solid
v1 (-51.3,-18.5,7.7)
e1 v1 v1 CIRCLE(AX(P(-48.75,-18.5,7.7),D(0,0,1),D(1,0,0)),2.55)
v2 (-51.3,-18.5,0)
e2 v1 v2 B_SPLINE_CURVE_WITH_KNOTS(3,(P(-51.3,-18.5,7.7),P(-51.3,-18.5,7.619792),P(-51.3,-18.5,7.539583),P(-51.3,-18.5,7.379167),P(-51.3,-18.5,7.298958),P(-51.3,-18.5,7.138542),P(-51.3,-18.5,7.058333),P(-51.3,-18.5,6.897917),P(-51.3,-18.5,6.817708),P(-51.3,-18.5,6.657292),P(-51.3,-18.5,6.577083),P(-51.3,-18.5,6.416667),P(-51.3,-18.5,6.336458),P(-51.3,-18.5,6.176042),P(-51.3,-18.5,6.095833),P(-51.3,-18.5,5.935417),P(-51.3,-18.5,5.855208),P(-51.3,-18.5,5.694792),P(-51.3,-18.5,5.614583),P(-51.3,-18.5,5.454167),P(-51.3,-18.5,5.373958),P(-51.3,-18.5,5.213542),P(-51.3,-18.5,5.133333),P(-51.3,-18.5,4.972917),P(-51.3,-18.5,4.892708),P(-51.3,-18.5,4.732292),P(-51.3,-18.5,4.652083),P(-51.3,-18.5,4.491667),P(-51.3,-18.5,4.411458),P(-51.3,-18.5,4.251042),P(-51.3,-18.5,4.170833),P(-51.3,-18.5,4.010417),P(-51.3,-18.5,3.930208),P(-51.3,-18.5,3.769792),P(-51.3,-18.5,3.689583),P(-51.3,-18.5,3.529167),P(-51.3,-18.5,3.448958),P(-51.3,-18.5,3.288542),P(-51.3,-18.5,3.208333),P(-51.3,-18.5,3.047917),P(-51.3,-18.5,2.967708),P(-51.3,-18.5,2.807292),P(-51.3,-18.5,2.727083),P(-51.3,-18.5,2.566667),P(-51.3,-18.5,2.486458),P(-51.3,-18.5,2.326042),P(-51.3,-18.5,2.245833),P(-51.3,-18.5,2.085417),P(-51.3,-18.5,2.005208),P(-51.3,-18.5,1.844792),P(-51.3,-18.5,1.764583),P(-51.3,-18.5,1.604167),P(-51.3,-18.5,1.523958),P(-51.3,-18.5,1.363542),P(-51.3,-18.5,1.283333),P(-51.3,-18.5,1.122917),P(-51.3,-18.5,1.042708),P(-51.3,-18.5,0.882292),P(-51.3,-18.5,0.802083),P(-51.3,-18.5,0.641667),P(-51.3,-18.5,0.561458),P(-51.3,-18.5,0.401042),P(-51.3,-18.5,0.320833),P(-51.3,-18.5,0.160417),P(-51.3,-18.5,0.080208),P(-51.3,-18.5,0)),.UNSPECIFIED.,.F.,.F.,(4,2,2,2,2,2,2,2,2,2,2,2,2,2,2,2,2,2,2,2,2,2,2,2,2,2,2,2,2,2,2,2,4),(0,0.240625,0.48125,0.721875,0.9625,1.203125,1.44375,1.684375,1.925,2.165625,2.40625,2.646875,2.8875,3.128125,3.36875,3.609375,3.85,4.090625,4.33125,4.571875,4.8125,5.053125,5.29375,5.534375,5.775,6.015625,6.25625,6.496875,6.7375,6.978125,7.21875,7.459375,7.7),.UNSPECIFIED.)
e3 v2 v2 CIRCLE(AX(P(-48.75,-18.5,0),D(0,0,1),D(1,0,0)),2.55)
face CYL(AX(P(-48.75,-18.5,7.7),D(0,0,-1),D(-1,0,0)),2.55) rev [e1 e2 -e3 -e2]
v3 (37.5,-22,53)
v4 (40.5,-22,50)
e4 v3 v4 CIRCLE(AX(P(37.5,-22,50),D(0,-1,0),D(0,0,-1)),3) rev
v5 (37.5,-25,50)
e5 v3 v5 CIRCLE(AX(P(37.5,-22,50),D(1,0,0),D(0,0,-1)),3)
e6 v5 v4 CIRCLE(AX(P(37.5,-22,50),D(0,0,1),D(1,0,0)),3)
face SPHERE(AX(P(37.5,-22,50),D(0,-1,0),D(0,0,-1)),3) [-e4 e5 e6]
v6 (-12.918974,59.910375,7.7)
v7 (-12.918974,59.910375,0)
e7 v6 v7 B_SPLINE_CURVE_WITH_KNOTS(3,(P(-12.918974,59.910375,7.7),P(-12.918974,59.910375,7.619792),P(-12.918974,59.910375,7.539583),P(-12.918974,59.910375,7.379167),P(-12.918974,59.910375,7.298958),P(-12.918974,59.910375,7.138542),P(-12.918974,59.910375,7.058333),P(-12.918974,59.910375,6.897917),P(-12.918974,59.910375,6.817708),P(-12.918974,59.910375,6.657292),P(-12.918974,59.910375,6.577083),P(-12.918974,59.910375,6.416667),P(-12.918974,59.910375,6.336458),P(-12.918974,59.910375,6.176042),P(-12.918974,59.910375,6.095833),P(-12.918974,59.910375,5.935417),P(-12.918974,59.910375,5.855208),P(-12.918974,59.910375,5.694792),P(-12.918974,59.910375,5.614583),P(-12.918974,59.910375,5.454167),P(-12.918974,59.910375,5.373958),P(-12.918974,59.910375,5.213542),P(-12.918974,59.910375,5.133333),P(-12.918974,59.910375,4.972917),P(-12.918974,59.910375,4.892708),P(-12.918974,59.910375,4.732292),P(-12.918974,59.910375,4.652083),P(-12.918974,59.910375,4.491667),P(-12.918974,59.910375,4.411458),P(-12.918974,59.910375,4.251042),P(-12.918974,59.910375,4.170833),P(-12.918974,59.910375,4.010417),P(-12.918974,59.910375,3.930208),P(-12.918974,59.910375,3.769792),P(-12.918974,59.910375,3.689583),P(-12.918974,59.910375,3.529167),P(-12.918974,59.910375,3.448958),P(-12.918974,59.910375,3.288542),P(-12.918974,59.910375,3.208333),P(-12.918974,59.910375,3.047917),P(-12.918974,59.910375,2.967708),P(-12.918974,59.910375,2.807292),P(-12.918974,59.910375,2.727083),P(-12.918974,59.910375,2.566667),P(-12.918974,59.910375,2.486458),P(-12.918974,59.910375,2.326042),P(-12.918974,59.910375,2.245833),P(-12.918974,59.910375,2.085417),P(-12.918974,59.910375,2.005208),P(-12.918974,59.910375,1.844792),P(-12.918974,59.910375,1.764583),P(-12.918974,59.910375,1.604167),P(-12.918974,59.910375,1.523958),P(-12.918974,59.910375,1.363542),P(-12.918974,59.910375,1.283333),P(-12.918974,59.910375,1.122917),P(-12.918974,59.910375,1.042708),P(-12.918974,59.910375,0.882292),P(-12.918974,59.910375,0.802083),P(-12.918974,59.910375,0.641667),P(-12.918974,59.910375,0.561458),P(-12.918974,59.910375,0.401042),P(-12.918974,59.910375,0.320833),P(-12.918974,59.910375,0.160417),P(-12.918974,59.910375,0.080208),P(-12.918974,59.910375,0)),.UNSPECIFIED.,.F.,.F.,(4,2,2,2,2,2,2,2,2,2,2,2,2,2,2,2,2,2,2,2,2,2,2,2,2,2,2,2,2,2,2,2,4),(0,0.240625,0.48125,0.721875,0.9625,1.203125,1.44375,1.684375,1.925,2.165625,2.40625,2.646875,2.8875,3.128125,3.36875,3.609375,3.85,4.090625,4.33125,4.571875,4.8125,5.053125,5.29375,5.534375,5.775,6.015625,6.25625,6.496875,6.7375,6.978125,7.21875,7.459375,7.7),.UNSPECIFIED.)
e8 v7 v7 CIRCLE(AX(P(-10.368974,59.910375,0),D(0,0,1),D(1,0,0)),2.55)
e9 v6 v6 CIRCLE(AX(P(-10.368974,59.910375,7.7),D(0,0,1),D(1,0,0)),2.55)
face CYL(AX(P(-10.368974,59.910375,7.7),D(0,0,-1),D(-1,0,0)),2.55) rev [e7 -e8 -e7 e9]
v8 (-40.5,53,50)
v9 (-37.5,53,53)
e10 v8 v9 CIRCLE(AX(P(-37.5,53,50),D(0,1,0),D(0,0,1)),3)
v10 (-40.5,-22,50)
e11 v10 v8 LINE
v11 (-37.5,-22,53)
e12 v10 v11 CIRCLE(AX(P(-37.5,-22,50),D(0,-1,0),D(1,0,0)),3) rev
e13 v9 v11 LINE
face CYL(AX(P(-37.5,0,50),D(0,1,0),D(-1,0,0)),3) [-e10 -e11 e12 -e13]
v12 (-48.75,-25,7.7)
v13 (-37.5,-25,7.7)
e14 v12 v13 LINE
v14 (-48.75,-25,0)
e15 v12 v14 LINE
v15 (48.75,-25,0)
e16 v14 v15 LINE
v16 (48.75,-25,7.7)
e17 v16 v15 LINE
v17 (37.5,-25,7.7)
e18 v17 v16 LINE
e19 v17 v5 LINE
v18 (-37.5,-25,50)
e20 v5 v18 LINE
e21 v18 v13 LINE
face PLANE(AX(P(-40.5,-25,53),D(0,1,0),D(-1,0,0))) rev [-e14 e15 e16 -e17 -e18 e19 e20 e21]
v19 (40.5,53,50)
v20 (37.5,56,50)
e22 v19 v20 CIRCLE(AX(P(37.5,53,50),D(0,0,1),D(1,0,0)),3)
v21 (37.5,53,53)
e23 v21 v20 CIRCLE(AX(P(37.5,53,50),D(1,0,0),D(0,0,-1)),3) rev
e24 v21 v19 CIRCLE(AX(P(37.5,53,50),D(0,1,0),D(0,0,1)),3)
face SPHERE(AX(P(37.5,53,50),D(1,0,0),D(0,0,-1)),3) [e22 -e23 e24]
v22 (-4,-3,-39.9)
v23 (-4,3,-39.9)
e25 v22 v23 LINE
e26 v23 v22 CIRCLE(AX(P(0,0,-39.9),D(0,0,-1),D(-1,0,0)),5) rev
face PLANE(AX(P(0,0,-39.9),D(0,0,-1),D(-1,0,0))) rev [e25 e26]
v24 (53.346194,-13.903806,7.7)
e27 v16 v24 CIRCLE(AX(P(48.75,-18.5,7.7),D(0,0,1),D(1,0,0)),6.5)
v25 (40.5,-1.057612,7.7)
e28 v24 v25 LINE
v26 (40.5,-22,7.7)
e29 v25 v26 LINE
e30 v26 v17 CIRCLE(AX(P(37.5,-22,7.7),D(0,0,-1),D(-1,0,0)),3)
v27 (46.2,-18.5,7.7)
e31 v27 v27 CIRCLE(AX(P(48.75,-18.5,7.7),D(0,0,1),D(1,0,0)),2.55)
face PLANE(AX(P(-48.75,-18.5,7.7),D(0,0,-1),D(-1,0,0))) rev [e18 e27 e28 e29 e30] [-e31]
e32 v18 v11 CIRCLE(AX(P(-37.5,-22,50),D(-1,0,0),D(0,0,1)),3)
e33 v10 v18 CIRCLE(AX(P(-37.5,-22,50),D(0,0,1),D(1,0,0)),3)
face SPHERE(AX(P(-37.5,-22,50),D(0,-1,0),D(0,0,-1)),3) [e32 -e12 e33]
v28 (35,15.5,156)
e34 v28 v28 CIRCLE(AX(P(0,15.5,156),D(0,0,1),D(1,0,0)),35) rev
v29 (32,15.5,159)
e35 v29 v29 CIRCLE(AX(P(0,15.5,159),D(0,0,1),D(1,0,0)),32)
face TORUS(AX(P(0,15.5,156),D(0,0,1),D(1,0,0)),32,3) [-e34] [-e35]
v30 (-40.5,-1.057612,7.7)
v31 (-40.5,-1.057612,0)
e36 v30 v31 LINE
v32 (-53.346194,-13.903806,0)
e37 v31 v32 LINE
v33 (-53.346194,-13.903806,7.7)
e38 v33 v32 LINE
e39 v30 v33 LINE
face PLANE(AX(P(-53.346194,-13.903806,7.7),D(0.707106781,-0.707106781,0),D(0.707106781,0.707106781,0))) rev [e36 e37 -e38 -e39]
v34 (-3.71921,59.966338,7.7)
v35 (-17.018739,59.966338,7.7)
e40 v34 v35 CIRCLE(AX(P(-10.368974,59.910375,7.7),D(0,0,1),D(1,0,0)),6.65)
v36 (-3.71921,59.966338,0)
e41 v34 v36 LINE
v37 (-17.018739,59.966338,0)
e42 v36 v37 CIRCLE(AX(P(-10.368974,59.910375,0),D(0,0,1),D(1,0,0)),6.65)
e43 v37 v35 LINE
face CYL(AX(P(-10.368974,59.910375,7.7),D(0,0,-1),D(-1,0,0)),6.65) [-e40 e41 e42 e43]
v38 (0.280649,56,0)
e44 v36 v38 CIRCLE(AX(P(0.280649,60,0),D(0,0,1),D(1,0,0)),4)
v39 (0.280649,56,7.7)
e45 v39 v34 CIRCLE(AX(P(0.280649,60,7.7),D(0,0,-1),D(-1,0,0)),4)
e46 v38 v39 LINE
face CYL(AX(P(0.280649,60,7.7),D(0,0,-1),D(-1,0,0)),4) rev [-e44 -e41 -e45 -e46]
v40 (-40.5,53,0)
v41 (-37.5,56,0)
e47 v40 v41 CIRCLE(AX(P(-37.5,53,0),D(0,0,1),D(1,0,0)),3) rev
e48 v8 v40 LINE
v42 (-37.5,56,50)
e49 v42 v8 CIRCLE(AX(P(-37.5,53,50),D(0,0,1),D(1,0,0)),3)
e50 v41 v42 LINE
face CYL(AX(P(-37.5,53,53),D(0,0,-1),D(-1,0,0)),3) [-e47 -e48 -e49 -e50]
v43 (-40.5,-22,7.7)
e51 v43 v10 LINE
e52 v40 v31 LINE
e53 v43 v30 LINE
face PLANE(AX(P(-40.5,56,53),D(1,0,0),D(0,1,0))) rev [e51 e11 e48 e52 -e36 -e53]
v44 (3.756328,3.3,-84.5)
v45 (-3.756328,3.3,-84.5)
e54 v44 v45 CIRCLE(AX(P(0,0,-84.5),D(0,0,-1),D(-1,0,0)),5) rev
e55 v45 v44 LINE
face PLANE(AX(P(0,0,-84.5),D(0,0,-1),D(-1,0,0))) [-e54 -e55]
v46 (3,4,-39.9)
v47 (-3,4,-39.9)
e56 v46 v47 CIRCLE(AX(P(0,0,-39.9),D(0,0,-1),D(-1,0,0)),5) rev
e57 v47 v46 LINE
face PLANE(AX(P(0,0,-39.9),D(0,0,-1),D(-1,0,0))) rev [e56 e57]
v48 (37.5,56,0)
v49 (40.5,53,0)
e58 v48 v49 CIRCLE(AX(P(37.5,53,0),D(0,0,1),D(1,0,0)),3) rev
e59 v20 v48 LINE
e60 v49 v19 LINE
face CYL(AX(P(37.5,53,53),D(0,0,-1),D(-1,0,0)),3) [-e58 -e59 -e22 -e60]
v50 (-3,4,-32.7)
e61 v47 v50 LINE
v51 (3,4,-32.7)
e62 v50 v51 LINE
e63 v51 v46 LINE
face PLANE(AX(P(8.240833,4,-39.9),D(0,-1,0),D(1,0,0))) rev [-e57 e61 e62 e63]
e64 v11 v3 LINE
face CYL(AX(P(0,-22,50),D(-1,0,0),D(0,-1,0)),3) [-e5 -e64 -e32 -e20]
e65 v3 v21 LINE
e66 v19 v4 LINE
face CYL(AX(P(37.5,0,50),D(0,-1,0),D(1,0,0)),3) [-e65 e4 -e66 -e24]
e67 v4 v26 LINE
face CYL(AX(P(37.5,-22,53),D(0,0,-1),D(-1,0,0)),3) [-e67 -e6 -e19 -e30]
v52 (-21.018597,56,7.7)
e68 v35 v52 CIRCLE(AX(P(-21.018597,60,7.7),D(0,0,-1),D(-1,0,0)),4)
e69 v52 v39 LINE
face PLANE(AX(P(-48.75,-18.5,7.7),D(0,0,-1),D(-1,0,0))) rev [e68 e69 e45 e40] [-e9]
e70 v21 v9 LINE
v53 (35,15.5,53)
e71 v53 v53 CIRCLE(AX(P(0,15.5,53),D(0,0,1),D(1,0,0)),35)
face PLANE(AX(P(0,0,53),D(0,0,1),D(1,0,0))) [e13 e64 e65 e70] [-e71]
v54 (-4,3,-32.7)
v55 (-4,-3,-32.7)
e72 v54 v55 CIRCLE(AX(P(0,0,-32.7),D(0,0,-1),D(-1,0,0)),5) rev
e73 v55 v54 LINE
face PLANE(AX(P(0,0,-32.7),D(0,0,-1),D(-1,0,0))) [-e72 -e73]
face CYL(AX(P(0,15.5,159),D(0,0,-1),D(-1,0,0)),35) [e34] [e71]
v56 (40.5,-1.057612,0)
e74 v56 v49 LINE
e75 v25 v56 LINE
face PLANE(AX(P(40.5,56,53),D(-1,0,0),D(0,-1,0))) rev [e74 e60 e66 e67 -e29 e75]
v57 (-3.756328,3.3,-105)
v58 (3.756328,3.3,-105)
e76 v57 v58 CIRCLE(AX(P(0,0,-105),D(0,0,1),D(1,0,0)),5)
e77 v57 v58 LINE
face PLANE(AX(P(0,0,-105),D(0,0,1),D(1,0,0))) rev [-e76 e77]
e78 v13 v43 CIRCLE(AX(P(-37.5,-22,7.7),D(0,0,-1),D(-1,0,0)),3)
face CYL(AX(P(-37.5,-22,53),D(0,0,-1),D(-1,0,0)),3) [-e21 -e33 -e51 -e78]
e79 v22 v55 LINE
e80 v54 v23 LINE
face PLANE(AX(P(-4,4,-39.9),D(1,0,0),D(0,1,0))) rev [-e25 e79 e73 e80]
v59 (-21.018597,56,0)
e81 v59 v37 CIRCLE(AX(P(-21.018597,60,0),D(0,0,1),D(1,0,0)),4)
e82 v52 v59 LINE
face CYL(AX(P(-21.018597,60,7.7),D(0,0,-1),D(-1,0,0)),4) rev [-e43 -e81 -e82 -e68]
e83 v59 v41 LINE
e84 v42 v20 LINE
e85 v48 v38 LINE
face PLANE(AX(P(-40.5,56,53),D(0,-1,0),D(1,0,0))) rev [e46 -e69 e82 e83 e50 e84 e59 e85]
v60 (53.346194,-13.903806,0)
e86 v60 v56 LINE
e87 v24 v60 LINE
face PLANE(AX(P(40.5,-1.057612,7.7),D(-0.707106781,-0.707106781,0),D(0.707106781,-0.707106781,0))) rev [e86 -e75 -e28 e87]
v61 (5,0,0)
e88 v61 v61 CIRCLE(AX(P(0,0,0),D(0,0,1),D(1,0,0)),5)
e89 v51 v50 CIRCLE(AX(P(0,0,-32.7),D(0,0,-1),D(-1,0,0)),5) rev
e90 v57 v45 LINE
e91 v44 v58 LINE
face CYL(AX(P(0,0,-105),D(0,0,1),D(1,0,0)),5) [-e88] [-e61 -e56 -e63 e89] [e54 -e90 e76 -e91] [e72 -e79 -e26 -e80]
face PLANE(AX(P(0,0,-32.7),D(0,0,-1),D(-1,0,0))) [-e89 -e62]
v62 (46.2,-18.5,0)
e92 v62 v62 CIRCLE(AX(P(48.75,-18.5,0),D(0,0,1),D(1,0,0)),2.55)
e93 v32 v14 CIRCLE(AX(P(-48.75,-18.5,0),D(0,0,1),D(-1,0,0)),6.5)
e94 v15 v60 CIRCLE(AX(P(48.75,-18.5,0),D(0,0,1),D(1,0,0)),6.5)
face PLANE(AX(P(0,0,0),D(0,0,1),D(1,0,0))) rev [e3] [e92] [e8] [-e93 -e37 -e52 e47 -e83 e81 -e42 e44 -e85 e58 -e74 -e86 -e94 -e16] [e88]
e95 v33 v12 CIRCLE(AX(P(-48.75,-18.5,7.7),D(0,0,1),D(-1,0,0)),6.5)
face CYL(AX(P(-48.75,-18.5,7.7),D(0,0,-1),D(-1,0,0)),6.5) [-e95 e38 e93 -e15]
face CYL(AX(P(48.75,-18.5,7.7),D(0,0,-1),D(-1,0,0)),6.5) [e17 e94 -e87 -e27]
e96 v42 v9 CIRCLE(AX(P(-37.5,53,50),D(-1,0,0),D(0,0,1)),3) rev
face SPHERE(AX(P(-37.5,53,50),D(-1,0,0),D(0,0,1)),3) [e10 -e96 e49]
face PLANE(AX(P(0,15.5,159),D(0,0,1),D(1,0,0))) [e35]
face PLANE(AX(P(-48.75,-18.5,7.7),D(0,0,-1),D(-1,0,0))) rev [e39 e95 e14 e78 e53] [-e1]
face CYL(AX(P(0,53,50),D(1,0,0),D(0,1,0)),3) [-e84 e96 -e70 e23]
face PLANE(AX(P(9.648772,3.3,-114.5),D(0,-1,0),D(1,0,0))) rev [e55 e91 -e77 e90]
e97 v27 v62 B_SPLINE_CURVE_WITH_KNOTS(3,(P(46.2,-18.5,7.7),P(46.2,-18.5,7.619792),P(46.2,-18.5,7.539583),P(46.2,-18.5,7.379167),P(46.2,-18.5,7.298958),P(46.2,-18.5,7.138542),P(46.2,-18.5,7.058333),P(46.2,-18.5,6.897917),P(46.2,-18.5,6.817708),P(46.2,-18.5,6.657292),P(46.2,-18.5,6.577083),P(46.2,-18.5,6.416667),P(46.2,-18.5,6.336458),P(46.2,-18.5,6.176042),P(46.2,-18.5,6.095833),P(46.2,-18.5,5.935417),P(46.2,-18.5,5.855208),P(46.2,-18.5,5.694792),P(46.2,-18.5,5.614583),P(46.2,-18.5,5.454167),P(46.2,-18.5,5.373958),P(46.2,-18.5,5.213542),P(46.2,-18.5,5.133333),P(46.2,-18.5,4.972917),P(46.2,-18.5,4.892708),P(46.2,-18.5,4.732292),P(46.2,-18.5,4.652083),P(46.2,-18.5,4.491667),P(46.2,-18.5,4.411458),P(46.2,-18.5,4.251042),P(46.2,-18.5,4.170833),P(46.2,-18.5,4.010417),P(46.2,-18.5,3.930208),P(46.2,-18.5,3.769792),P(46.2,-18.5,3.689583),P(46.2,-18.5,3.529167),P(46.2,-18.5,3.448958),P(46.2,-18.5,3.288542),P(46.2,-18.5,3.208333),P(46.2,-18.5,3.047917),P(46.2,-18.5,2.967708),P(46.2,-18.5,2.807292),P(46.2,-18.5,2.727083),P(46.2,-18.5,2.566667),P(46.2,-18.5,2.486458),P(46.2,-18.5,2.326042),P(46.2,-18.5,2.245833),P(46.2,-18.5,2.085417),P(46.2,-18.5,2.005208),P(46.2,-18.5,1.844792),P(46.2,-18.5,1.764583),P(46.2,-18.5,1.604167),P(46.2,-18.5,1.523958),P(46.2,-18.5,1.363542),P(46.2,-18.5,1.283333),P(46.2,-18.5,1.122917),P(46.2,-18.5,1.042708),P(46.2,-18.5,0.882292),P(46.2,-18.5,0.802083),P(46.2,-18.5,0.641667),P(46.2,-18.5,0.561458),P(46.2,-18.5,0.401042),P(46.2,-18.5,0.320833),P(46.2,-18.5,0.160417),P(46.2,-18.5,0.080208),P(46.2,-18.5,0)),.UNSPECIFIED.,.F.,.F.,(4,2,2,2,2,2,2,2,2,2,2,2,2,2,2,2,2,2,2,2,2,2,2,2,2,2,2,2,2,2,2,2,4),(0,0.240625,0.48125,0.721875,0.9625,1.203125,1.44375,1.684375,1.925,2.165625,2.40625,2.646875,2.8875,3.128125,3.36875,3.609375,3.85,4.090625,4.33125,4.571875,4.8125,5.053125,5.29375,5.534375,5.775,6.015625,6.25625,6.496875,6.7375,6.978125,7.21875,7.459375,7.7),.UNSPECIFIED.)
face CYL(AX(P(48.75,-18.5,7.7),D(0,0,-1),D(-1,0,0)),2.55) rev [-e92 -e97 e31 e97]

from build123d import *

# Parameters (mm, degrees)
SKETCH1_W           = 81
SKETCH1_H           = 81
BOSS_EXTRUDE1_DEPTH = 53
SKETCH2_R           = 35
BOSS_EXTRUDE2_DEPTH = 106
SKETCH3_R           = 5
BOSS_EXTRUDE3_DEPTH = 105
SKETCH4_R           = 2.55
BOSS_EXTRUDE4_DEPTH = 7.7
FILLET1_R           = 4
FILLET2_R           = 3
CUT_EXTRUDE1_START  = -84.5
SKETCH5_W           = 18.690524158
SKETCH5_H           = 8.031084599
CUT_EXTRUDE1_DEPTH  = 30
CUT_EXTRUDE2_START  = -32.7
CUT_EXTRUDE2_DEPTH  = 7.2


with BuildPart() as part:
    # Sketch1 → Boss-Extrude1 (new body)
    with BuildSketch(Plane.XY):
        with Locations((0, 15.5)):
            Rectangle(SKETCH1_W, SKETCH1_H)
    extrude(amount=BOSS_EXTRUDE1_DEPTH)

    # Sketch2 → Boss-Extrude2 (add)
    with BuildSketch(Plane.XY.offset(53)):
        with Locations((0, 15.5)):
            Circle(SKETCH2_R)
    extrude(amount=BOSS_EXTRUDE2_DEPTH)

    # Sketch3 → Boss-Extrude3 (add)
    with BuildSketch(Plane.XY):
        Circle(SKETCH3_R)
    extrude(amount=-BOSS_EXTRUDE3_DEPTH)

    # Sketch4 → Boss-Extrude4 (add)
    with BuildSketch(Plane.XY):
        with BuildLine():
            Line((-48.75, -25), (48.75, -25))
            ThreePointArc((48.75, -25), (54.755216961, -20.98744231), (53.346194078, -13.903805922))
            Line((53.346194078, -13.903805922), (40.5, -1.057611845))
            Line((40.5, -1.057611845), (40.5, 56))
            Line((40.5, 56), (-3.718974359, 56))
            Line((-3.718974359, 56), (-3.718974359, 59.910374765))
            ThreePointArc((-3.718974359, 59.910374765), (-10.368974359, 66.560374765), (-17.018974359, 59.910374765))
            Line((-17.018974359, 59.910374765), (-17.018974359, 56))
            Line((-17.018974359, 56), (-40.5, 56))
            Line((-40.5, 56), (-40.5, -1.057611845))
            Line((-40.5, -1.057611845), (-53.346194078, -13.903805922))
            ThreePointArc((-53.346194078, -13.903805922), (-54.755216961, -20.98744231), (-48.75, -25))
        make_face()
        with Locations(Location((-48.75, -18.5, 0), (0, 0, 180))):
            Circle(SKETCH4_R, mode=Mode.SUBTRACT)
        with Locations(Location((48.75, -18.5, 0), (0, 0, 180))):
            Circle(SKETCH4_R, mode=Mode.SUBTRACT)
        with Locations(Location((-10.368974359, 59.910374765, 0), (0, 0, 180))):
            Circle(SKETCH4_R, mode=Mode.SUBTRACT)
    extrude(amount=BOSS_EXTRUDE4_DEPTH)

    # Fillet1
    # the kernel refuses this fillet: 4 mm, written as the material it adds along each edge
    with BuildSketch(Plane(origin=(-17.018974359, 56, 0), x_dir=(-1, 0, 0), z_dir=(0, 0, 1))) as fillet1_piece_1:
        with BuildLine():
            CenterArc((3.999622872, -4), FILLET1_R, 90, 89.517820814)
            Line((-0.000235484, -3.96633794), (-0.400221319, -3.962971734))
            ThreePointArc((-0.400221319, -3.962971734), (-0.4, -3.910374765), (-0.4, 0))
            Line((-0.4, 0), (0, 0.4))
            Line((0, 0.4), (3.999622872, 0.4))
            Line((3.999622872, 0.4), (3.999622872, 0))
        make_face()
    extrude(amount=7.7)
    with BuildSketch(Plane(origin=(-3.718974359, 56, 0), x_dir=(1, 0, 0), z_dir=(0, 0, 1))) as fillet1_piece_2:
        with BuildLine():
            CenterArc((3.999622872, 4), FILLET1_R, 180.482179186, 89.517820814)
            Line((-0.000235484, 3.96633794), (-0.400221319, 3.962971734))
            ThreePointArc((-0.400221319, 3.962971734), (-0.4, 3.910374765), (-0.4, 0))
            Line((-0.4, 0), (0, -0.4))
            Line((0, -0.4), (3.999622872, -0.4))
            Line((3.999622872, -0.4), (3.999622872, 0))
        make_face()
    extrude(amount=7.7)

    # Fillet2
    fillet2_edges = [part.edges().sort_by_distance(p)[0] for p in [
        (40.5, 15.5, 53),
        (-35, 15.5, 159),
        (0, 56, 53),
        (-40.5, 15.5, 53),
        (-40.5, 56, 26.5),
        (40.5, 56, 26.5),
        (40.5, -25, 30.35),
        (-40.5, -25, 30.35),
        (0, -25, 53),
    ]]
    fillet(fillet2_edges, radius=FILLET2_R)

    # Sketch5 → Cut-Extrude1 (cut)
    with BuildSketch(Plane.XY.offset(CUT_EXTRUDE1_START)):
        with Locations((0.303510312, 7.3155423)):
            Rectangle(SKETCH5_W, SKETCH5_H)
    extrude(amount=-CUT_EXTRUDE1_DEPTH, mode=Mode.SUBTRACT)

    # Sketch6 → Cut-Extrude2 (cut)
    with BuildSketch(Plane.XY.offset(CUT_EXTRUDE2_START)):
        Polygon((8.240833127, 7.650995437), (8.240833127, 4), (-4, 4), (-4, -6.044194101), (-7.393498293, -6.044194101), (-7.393498293, 7.650995437), align=None)
    extrude(amount=-CUT_EXTRUDE2_DEPTH, mode=Mode.SUBTRACT)


solid = part.part
